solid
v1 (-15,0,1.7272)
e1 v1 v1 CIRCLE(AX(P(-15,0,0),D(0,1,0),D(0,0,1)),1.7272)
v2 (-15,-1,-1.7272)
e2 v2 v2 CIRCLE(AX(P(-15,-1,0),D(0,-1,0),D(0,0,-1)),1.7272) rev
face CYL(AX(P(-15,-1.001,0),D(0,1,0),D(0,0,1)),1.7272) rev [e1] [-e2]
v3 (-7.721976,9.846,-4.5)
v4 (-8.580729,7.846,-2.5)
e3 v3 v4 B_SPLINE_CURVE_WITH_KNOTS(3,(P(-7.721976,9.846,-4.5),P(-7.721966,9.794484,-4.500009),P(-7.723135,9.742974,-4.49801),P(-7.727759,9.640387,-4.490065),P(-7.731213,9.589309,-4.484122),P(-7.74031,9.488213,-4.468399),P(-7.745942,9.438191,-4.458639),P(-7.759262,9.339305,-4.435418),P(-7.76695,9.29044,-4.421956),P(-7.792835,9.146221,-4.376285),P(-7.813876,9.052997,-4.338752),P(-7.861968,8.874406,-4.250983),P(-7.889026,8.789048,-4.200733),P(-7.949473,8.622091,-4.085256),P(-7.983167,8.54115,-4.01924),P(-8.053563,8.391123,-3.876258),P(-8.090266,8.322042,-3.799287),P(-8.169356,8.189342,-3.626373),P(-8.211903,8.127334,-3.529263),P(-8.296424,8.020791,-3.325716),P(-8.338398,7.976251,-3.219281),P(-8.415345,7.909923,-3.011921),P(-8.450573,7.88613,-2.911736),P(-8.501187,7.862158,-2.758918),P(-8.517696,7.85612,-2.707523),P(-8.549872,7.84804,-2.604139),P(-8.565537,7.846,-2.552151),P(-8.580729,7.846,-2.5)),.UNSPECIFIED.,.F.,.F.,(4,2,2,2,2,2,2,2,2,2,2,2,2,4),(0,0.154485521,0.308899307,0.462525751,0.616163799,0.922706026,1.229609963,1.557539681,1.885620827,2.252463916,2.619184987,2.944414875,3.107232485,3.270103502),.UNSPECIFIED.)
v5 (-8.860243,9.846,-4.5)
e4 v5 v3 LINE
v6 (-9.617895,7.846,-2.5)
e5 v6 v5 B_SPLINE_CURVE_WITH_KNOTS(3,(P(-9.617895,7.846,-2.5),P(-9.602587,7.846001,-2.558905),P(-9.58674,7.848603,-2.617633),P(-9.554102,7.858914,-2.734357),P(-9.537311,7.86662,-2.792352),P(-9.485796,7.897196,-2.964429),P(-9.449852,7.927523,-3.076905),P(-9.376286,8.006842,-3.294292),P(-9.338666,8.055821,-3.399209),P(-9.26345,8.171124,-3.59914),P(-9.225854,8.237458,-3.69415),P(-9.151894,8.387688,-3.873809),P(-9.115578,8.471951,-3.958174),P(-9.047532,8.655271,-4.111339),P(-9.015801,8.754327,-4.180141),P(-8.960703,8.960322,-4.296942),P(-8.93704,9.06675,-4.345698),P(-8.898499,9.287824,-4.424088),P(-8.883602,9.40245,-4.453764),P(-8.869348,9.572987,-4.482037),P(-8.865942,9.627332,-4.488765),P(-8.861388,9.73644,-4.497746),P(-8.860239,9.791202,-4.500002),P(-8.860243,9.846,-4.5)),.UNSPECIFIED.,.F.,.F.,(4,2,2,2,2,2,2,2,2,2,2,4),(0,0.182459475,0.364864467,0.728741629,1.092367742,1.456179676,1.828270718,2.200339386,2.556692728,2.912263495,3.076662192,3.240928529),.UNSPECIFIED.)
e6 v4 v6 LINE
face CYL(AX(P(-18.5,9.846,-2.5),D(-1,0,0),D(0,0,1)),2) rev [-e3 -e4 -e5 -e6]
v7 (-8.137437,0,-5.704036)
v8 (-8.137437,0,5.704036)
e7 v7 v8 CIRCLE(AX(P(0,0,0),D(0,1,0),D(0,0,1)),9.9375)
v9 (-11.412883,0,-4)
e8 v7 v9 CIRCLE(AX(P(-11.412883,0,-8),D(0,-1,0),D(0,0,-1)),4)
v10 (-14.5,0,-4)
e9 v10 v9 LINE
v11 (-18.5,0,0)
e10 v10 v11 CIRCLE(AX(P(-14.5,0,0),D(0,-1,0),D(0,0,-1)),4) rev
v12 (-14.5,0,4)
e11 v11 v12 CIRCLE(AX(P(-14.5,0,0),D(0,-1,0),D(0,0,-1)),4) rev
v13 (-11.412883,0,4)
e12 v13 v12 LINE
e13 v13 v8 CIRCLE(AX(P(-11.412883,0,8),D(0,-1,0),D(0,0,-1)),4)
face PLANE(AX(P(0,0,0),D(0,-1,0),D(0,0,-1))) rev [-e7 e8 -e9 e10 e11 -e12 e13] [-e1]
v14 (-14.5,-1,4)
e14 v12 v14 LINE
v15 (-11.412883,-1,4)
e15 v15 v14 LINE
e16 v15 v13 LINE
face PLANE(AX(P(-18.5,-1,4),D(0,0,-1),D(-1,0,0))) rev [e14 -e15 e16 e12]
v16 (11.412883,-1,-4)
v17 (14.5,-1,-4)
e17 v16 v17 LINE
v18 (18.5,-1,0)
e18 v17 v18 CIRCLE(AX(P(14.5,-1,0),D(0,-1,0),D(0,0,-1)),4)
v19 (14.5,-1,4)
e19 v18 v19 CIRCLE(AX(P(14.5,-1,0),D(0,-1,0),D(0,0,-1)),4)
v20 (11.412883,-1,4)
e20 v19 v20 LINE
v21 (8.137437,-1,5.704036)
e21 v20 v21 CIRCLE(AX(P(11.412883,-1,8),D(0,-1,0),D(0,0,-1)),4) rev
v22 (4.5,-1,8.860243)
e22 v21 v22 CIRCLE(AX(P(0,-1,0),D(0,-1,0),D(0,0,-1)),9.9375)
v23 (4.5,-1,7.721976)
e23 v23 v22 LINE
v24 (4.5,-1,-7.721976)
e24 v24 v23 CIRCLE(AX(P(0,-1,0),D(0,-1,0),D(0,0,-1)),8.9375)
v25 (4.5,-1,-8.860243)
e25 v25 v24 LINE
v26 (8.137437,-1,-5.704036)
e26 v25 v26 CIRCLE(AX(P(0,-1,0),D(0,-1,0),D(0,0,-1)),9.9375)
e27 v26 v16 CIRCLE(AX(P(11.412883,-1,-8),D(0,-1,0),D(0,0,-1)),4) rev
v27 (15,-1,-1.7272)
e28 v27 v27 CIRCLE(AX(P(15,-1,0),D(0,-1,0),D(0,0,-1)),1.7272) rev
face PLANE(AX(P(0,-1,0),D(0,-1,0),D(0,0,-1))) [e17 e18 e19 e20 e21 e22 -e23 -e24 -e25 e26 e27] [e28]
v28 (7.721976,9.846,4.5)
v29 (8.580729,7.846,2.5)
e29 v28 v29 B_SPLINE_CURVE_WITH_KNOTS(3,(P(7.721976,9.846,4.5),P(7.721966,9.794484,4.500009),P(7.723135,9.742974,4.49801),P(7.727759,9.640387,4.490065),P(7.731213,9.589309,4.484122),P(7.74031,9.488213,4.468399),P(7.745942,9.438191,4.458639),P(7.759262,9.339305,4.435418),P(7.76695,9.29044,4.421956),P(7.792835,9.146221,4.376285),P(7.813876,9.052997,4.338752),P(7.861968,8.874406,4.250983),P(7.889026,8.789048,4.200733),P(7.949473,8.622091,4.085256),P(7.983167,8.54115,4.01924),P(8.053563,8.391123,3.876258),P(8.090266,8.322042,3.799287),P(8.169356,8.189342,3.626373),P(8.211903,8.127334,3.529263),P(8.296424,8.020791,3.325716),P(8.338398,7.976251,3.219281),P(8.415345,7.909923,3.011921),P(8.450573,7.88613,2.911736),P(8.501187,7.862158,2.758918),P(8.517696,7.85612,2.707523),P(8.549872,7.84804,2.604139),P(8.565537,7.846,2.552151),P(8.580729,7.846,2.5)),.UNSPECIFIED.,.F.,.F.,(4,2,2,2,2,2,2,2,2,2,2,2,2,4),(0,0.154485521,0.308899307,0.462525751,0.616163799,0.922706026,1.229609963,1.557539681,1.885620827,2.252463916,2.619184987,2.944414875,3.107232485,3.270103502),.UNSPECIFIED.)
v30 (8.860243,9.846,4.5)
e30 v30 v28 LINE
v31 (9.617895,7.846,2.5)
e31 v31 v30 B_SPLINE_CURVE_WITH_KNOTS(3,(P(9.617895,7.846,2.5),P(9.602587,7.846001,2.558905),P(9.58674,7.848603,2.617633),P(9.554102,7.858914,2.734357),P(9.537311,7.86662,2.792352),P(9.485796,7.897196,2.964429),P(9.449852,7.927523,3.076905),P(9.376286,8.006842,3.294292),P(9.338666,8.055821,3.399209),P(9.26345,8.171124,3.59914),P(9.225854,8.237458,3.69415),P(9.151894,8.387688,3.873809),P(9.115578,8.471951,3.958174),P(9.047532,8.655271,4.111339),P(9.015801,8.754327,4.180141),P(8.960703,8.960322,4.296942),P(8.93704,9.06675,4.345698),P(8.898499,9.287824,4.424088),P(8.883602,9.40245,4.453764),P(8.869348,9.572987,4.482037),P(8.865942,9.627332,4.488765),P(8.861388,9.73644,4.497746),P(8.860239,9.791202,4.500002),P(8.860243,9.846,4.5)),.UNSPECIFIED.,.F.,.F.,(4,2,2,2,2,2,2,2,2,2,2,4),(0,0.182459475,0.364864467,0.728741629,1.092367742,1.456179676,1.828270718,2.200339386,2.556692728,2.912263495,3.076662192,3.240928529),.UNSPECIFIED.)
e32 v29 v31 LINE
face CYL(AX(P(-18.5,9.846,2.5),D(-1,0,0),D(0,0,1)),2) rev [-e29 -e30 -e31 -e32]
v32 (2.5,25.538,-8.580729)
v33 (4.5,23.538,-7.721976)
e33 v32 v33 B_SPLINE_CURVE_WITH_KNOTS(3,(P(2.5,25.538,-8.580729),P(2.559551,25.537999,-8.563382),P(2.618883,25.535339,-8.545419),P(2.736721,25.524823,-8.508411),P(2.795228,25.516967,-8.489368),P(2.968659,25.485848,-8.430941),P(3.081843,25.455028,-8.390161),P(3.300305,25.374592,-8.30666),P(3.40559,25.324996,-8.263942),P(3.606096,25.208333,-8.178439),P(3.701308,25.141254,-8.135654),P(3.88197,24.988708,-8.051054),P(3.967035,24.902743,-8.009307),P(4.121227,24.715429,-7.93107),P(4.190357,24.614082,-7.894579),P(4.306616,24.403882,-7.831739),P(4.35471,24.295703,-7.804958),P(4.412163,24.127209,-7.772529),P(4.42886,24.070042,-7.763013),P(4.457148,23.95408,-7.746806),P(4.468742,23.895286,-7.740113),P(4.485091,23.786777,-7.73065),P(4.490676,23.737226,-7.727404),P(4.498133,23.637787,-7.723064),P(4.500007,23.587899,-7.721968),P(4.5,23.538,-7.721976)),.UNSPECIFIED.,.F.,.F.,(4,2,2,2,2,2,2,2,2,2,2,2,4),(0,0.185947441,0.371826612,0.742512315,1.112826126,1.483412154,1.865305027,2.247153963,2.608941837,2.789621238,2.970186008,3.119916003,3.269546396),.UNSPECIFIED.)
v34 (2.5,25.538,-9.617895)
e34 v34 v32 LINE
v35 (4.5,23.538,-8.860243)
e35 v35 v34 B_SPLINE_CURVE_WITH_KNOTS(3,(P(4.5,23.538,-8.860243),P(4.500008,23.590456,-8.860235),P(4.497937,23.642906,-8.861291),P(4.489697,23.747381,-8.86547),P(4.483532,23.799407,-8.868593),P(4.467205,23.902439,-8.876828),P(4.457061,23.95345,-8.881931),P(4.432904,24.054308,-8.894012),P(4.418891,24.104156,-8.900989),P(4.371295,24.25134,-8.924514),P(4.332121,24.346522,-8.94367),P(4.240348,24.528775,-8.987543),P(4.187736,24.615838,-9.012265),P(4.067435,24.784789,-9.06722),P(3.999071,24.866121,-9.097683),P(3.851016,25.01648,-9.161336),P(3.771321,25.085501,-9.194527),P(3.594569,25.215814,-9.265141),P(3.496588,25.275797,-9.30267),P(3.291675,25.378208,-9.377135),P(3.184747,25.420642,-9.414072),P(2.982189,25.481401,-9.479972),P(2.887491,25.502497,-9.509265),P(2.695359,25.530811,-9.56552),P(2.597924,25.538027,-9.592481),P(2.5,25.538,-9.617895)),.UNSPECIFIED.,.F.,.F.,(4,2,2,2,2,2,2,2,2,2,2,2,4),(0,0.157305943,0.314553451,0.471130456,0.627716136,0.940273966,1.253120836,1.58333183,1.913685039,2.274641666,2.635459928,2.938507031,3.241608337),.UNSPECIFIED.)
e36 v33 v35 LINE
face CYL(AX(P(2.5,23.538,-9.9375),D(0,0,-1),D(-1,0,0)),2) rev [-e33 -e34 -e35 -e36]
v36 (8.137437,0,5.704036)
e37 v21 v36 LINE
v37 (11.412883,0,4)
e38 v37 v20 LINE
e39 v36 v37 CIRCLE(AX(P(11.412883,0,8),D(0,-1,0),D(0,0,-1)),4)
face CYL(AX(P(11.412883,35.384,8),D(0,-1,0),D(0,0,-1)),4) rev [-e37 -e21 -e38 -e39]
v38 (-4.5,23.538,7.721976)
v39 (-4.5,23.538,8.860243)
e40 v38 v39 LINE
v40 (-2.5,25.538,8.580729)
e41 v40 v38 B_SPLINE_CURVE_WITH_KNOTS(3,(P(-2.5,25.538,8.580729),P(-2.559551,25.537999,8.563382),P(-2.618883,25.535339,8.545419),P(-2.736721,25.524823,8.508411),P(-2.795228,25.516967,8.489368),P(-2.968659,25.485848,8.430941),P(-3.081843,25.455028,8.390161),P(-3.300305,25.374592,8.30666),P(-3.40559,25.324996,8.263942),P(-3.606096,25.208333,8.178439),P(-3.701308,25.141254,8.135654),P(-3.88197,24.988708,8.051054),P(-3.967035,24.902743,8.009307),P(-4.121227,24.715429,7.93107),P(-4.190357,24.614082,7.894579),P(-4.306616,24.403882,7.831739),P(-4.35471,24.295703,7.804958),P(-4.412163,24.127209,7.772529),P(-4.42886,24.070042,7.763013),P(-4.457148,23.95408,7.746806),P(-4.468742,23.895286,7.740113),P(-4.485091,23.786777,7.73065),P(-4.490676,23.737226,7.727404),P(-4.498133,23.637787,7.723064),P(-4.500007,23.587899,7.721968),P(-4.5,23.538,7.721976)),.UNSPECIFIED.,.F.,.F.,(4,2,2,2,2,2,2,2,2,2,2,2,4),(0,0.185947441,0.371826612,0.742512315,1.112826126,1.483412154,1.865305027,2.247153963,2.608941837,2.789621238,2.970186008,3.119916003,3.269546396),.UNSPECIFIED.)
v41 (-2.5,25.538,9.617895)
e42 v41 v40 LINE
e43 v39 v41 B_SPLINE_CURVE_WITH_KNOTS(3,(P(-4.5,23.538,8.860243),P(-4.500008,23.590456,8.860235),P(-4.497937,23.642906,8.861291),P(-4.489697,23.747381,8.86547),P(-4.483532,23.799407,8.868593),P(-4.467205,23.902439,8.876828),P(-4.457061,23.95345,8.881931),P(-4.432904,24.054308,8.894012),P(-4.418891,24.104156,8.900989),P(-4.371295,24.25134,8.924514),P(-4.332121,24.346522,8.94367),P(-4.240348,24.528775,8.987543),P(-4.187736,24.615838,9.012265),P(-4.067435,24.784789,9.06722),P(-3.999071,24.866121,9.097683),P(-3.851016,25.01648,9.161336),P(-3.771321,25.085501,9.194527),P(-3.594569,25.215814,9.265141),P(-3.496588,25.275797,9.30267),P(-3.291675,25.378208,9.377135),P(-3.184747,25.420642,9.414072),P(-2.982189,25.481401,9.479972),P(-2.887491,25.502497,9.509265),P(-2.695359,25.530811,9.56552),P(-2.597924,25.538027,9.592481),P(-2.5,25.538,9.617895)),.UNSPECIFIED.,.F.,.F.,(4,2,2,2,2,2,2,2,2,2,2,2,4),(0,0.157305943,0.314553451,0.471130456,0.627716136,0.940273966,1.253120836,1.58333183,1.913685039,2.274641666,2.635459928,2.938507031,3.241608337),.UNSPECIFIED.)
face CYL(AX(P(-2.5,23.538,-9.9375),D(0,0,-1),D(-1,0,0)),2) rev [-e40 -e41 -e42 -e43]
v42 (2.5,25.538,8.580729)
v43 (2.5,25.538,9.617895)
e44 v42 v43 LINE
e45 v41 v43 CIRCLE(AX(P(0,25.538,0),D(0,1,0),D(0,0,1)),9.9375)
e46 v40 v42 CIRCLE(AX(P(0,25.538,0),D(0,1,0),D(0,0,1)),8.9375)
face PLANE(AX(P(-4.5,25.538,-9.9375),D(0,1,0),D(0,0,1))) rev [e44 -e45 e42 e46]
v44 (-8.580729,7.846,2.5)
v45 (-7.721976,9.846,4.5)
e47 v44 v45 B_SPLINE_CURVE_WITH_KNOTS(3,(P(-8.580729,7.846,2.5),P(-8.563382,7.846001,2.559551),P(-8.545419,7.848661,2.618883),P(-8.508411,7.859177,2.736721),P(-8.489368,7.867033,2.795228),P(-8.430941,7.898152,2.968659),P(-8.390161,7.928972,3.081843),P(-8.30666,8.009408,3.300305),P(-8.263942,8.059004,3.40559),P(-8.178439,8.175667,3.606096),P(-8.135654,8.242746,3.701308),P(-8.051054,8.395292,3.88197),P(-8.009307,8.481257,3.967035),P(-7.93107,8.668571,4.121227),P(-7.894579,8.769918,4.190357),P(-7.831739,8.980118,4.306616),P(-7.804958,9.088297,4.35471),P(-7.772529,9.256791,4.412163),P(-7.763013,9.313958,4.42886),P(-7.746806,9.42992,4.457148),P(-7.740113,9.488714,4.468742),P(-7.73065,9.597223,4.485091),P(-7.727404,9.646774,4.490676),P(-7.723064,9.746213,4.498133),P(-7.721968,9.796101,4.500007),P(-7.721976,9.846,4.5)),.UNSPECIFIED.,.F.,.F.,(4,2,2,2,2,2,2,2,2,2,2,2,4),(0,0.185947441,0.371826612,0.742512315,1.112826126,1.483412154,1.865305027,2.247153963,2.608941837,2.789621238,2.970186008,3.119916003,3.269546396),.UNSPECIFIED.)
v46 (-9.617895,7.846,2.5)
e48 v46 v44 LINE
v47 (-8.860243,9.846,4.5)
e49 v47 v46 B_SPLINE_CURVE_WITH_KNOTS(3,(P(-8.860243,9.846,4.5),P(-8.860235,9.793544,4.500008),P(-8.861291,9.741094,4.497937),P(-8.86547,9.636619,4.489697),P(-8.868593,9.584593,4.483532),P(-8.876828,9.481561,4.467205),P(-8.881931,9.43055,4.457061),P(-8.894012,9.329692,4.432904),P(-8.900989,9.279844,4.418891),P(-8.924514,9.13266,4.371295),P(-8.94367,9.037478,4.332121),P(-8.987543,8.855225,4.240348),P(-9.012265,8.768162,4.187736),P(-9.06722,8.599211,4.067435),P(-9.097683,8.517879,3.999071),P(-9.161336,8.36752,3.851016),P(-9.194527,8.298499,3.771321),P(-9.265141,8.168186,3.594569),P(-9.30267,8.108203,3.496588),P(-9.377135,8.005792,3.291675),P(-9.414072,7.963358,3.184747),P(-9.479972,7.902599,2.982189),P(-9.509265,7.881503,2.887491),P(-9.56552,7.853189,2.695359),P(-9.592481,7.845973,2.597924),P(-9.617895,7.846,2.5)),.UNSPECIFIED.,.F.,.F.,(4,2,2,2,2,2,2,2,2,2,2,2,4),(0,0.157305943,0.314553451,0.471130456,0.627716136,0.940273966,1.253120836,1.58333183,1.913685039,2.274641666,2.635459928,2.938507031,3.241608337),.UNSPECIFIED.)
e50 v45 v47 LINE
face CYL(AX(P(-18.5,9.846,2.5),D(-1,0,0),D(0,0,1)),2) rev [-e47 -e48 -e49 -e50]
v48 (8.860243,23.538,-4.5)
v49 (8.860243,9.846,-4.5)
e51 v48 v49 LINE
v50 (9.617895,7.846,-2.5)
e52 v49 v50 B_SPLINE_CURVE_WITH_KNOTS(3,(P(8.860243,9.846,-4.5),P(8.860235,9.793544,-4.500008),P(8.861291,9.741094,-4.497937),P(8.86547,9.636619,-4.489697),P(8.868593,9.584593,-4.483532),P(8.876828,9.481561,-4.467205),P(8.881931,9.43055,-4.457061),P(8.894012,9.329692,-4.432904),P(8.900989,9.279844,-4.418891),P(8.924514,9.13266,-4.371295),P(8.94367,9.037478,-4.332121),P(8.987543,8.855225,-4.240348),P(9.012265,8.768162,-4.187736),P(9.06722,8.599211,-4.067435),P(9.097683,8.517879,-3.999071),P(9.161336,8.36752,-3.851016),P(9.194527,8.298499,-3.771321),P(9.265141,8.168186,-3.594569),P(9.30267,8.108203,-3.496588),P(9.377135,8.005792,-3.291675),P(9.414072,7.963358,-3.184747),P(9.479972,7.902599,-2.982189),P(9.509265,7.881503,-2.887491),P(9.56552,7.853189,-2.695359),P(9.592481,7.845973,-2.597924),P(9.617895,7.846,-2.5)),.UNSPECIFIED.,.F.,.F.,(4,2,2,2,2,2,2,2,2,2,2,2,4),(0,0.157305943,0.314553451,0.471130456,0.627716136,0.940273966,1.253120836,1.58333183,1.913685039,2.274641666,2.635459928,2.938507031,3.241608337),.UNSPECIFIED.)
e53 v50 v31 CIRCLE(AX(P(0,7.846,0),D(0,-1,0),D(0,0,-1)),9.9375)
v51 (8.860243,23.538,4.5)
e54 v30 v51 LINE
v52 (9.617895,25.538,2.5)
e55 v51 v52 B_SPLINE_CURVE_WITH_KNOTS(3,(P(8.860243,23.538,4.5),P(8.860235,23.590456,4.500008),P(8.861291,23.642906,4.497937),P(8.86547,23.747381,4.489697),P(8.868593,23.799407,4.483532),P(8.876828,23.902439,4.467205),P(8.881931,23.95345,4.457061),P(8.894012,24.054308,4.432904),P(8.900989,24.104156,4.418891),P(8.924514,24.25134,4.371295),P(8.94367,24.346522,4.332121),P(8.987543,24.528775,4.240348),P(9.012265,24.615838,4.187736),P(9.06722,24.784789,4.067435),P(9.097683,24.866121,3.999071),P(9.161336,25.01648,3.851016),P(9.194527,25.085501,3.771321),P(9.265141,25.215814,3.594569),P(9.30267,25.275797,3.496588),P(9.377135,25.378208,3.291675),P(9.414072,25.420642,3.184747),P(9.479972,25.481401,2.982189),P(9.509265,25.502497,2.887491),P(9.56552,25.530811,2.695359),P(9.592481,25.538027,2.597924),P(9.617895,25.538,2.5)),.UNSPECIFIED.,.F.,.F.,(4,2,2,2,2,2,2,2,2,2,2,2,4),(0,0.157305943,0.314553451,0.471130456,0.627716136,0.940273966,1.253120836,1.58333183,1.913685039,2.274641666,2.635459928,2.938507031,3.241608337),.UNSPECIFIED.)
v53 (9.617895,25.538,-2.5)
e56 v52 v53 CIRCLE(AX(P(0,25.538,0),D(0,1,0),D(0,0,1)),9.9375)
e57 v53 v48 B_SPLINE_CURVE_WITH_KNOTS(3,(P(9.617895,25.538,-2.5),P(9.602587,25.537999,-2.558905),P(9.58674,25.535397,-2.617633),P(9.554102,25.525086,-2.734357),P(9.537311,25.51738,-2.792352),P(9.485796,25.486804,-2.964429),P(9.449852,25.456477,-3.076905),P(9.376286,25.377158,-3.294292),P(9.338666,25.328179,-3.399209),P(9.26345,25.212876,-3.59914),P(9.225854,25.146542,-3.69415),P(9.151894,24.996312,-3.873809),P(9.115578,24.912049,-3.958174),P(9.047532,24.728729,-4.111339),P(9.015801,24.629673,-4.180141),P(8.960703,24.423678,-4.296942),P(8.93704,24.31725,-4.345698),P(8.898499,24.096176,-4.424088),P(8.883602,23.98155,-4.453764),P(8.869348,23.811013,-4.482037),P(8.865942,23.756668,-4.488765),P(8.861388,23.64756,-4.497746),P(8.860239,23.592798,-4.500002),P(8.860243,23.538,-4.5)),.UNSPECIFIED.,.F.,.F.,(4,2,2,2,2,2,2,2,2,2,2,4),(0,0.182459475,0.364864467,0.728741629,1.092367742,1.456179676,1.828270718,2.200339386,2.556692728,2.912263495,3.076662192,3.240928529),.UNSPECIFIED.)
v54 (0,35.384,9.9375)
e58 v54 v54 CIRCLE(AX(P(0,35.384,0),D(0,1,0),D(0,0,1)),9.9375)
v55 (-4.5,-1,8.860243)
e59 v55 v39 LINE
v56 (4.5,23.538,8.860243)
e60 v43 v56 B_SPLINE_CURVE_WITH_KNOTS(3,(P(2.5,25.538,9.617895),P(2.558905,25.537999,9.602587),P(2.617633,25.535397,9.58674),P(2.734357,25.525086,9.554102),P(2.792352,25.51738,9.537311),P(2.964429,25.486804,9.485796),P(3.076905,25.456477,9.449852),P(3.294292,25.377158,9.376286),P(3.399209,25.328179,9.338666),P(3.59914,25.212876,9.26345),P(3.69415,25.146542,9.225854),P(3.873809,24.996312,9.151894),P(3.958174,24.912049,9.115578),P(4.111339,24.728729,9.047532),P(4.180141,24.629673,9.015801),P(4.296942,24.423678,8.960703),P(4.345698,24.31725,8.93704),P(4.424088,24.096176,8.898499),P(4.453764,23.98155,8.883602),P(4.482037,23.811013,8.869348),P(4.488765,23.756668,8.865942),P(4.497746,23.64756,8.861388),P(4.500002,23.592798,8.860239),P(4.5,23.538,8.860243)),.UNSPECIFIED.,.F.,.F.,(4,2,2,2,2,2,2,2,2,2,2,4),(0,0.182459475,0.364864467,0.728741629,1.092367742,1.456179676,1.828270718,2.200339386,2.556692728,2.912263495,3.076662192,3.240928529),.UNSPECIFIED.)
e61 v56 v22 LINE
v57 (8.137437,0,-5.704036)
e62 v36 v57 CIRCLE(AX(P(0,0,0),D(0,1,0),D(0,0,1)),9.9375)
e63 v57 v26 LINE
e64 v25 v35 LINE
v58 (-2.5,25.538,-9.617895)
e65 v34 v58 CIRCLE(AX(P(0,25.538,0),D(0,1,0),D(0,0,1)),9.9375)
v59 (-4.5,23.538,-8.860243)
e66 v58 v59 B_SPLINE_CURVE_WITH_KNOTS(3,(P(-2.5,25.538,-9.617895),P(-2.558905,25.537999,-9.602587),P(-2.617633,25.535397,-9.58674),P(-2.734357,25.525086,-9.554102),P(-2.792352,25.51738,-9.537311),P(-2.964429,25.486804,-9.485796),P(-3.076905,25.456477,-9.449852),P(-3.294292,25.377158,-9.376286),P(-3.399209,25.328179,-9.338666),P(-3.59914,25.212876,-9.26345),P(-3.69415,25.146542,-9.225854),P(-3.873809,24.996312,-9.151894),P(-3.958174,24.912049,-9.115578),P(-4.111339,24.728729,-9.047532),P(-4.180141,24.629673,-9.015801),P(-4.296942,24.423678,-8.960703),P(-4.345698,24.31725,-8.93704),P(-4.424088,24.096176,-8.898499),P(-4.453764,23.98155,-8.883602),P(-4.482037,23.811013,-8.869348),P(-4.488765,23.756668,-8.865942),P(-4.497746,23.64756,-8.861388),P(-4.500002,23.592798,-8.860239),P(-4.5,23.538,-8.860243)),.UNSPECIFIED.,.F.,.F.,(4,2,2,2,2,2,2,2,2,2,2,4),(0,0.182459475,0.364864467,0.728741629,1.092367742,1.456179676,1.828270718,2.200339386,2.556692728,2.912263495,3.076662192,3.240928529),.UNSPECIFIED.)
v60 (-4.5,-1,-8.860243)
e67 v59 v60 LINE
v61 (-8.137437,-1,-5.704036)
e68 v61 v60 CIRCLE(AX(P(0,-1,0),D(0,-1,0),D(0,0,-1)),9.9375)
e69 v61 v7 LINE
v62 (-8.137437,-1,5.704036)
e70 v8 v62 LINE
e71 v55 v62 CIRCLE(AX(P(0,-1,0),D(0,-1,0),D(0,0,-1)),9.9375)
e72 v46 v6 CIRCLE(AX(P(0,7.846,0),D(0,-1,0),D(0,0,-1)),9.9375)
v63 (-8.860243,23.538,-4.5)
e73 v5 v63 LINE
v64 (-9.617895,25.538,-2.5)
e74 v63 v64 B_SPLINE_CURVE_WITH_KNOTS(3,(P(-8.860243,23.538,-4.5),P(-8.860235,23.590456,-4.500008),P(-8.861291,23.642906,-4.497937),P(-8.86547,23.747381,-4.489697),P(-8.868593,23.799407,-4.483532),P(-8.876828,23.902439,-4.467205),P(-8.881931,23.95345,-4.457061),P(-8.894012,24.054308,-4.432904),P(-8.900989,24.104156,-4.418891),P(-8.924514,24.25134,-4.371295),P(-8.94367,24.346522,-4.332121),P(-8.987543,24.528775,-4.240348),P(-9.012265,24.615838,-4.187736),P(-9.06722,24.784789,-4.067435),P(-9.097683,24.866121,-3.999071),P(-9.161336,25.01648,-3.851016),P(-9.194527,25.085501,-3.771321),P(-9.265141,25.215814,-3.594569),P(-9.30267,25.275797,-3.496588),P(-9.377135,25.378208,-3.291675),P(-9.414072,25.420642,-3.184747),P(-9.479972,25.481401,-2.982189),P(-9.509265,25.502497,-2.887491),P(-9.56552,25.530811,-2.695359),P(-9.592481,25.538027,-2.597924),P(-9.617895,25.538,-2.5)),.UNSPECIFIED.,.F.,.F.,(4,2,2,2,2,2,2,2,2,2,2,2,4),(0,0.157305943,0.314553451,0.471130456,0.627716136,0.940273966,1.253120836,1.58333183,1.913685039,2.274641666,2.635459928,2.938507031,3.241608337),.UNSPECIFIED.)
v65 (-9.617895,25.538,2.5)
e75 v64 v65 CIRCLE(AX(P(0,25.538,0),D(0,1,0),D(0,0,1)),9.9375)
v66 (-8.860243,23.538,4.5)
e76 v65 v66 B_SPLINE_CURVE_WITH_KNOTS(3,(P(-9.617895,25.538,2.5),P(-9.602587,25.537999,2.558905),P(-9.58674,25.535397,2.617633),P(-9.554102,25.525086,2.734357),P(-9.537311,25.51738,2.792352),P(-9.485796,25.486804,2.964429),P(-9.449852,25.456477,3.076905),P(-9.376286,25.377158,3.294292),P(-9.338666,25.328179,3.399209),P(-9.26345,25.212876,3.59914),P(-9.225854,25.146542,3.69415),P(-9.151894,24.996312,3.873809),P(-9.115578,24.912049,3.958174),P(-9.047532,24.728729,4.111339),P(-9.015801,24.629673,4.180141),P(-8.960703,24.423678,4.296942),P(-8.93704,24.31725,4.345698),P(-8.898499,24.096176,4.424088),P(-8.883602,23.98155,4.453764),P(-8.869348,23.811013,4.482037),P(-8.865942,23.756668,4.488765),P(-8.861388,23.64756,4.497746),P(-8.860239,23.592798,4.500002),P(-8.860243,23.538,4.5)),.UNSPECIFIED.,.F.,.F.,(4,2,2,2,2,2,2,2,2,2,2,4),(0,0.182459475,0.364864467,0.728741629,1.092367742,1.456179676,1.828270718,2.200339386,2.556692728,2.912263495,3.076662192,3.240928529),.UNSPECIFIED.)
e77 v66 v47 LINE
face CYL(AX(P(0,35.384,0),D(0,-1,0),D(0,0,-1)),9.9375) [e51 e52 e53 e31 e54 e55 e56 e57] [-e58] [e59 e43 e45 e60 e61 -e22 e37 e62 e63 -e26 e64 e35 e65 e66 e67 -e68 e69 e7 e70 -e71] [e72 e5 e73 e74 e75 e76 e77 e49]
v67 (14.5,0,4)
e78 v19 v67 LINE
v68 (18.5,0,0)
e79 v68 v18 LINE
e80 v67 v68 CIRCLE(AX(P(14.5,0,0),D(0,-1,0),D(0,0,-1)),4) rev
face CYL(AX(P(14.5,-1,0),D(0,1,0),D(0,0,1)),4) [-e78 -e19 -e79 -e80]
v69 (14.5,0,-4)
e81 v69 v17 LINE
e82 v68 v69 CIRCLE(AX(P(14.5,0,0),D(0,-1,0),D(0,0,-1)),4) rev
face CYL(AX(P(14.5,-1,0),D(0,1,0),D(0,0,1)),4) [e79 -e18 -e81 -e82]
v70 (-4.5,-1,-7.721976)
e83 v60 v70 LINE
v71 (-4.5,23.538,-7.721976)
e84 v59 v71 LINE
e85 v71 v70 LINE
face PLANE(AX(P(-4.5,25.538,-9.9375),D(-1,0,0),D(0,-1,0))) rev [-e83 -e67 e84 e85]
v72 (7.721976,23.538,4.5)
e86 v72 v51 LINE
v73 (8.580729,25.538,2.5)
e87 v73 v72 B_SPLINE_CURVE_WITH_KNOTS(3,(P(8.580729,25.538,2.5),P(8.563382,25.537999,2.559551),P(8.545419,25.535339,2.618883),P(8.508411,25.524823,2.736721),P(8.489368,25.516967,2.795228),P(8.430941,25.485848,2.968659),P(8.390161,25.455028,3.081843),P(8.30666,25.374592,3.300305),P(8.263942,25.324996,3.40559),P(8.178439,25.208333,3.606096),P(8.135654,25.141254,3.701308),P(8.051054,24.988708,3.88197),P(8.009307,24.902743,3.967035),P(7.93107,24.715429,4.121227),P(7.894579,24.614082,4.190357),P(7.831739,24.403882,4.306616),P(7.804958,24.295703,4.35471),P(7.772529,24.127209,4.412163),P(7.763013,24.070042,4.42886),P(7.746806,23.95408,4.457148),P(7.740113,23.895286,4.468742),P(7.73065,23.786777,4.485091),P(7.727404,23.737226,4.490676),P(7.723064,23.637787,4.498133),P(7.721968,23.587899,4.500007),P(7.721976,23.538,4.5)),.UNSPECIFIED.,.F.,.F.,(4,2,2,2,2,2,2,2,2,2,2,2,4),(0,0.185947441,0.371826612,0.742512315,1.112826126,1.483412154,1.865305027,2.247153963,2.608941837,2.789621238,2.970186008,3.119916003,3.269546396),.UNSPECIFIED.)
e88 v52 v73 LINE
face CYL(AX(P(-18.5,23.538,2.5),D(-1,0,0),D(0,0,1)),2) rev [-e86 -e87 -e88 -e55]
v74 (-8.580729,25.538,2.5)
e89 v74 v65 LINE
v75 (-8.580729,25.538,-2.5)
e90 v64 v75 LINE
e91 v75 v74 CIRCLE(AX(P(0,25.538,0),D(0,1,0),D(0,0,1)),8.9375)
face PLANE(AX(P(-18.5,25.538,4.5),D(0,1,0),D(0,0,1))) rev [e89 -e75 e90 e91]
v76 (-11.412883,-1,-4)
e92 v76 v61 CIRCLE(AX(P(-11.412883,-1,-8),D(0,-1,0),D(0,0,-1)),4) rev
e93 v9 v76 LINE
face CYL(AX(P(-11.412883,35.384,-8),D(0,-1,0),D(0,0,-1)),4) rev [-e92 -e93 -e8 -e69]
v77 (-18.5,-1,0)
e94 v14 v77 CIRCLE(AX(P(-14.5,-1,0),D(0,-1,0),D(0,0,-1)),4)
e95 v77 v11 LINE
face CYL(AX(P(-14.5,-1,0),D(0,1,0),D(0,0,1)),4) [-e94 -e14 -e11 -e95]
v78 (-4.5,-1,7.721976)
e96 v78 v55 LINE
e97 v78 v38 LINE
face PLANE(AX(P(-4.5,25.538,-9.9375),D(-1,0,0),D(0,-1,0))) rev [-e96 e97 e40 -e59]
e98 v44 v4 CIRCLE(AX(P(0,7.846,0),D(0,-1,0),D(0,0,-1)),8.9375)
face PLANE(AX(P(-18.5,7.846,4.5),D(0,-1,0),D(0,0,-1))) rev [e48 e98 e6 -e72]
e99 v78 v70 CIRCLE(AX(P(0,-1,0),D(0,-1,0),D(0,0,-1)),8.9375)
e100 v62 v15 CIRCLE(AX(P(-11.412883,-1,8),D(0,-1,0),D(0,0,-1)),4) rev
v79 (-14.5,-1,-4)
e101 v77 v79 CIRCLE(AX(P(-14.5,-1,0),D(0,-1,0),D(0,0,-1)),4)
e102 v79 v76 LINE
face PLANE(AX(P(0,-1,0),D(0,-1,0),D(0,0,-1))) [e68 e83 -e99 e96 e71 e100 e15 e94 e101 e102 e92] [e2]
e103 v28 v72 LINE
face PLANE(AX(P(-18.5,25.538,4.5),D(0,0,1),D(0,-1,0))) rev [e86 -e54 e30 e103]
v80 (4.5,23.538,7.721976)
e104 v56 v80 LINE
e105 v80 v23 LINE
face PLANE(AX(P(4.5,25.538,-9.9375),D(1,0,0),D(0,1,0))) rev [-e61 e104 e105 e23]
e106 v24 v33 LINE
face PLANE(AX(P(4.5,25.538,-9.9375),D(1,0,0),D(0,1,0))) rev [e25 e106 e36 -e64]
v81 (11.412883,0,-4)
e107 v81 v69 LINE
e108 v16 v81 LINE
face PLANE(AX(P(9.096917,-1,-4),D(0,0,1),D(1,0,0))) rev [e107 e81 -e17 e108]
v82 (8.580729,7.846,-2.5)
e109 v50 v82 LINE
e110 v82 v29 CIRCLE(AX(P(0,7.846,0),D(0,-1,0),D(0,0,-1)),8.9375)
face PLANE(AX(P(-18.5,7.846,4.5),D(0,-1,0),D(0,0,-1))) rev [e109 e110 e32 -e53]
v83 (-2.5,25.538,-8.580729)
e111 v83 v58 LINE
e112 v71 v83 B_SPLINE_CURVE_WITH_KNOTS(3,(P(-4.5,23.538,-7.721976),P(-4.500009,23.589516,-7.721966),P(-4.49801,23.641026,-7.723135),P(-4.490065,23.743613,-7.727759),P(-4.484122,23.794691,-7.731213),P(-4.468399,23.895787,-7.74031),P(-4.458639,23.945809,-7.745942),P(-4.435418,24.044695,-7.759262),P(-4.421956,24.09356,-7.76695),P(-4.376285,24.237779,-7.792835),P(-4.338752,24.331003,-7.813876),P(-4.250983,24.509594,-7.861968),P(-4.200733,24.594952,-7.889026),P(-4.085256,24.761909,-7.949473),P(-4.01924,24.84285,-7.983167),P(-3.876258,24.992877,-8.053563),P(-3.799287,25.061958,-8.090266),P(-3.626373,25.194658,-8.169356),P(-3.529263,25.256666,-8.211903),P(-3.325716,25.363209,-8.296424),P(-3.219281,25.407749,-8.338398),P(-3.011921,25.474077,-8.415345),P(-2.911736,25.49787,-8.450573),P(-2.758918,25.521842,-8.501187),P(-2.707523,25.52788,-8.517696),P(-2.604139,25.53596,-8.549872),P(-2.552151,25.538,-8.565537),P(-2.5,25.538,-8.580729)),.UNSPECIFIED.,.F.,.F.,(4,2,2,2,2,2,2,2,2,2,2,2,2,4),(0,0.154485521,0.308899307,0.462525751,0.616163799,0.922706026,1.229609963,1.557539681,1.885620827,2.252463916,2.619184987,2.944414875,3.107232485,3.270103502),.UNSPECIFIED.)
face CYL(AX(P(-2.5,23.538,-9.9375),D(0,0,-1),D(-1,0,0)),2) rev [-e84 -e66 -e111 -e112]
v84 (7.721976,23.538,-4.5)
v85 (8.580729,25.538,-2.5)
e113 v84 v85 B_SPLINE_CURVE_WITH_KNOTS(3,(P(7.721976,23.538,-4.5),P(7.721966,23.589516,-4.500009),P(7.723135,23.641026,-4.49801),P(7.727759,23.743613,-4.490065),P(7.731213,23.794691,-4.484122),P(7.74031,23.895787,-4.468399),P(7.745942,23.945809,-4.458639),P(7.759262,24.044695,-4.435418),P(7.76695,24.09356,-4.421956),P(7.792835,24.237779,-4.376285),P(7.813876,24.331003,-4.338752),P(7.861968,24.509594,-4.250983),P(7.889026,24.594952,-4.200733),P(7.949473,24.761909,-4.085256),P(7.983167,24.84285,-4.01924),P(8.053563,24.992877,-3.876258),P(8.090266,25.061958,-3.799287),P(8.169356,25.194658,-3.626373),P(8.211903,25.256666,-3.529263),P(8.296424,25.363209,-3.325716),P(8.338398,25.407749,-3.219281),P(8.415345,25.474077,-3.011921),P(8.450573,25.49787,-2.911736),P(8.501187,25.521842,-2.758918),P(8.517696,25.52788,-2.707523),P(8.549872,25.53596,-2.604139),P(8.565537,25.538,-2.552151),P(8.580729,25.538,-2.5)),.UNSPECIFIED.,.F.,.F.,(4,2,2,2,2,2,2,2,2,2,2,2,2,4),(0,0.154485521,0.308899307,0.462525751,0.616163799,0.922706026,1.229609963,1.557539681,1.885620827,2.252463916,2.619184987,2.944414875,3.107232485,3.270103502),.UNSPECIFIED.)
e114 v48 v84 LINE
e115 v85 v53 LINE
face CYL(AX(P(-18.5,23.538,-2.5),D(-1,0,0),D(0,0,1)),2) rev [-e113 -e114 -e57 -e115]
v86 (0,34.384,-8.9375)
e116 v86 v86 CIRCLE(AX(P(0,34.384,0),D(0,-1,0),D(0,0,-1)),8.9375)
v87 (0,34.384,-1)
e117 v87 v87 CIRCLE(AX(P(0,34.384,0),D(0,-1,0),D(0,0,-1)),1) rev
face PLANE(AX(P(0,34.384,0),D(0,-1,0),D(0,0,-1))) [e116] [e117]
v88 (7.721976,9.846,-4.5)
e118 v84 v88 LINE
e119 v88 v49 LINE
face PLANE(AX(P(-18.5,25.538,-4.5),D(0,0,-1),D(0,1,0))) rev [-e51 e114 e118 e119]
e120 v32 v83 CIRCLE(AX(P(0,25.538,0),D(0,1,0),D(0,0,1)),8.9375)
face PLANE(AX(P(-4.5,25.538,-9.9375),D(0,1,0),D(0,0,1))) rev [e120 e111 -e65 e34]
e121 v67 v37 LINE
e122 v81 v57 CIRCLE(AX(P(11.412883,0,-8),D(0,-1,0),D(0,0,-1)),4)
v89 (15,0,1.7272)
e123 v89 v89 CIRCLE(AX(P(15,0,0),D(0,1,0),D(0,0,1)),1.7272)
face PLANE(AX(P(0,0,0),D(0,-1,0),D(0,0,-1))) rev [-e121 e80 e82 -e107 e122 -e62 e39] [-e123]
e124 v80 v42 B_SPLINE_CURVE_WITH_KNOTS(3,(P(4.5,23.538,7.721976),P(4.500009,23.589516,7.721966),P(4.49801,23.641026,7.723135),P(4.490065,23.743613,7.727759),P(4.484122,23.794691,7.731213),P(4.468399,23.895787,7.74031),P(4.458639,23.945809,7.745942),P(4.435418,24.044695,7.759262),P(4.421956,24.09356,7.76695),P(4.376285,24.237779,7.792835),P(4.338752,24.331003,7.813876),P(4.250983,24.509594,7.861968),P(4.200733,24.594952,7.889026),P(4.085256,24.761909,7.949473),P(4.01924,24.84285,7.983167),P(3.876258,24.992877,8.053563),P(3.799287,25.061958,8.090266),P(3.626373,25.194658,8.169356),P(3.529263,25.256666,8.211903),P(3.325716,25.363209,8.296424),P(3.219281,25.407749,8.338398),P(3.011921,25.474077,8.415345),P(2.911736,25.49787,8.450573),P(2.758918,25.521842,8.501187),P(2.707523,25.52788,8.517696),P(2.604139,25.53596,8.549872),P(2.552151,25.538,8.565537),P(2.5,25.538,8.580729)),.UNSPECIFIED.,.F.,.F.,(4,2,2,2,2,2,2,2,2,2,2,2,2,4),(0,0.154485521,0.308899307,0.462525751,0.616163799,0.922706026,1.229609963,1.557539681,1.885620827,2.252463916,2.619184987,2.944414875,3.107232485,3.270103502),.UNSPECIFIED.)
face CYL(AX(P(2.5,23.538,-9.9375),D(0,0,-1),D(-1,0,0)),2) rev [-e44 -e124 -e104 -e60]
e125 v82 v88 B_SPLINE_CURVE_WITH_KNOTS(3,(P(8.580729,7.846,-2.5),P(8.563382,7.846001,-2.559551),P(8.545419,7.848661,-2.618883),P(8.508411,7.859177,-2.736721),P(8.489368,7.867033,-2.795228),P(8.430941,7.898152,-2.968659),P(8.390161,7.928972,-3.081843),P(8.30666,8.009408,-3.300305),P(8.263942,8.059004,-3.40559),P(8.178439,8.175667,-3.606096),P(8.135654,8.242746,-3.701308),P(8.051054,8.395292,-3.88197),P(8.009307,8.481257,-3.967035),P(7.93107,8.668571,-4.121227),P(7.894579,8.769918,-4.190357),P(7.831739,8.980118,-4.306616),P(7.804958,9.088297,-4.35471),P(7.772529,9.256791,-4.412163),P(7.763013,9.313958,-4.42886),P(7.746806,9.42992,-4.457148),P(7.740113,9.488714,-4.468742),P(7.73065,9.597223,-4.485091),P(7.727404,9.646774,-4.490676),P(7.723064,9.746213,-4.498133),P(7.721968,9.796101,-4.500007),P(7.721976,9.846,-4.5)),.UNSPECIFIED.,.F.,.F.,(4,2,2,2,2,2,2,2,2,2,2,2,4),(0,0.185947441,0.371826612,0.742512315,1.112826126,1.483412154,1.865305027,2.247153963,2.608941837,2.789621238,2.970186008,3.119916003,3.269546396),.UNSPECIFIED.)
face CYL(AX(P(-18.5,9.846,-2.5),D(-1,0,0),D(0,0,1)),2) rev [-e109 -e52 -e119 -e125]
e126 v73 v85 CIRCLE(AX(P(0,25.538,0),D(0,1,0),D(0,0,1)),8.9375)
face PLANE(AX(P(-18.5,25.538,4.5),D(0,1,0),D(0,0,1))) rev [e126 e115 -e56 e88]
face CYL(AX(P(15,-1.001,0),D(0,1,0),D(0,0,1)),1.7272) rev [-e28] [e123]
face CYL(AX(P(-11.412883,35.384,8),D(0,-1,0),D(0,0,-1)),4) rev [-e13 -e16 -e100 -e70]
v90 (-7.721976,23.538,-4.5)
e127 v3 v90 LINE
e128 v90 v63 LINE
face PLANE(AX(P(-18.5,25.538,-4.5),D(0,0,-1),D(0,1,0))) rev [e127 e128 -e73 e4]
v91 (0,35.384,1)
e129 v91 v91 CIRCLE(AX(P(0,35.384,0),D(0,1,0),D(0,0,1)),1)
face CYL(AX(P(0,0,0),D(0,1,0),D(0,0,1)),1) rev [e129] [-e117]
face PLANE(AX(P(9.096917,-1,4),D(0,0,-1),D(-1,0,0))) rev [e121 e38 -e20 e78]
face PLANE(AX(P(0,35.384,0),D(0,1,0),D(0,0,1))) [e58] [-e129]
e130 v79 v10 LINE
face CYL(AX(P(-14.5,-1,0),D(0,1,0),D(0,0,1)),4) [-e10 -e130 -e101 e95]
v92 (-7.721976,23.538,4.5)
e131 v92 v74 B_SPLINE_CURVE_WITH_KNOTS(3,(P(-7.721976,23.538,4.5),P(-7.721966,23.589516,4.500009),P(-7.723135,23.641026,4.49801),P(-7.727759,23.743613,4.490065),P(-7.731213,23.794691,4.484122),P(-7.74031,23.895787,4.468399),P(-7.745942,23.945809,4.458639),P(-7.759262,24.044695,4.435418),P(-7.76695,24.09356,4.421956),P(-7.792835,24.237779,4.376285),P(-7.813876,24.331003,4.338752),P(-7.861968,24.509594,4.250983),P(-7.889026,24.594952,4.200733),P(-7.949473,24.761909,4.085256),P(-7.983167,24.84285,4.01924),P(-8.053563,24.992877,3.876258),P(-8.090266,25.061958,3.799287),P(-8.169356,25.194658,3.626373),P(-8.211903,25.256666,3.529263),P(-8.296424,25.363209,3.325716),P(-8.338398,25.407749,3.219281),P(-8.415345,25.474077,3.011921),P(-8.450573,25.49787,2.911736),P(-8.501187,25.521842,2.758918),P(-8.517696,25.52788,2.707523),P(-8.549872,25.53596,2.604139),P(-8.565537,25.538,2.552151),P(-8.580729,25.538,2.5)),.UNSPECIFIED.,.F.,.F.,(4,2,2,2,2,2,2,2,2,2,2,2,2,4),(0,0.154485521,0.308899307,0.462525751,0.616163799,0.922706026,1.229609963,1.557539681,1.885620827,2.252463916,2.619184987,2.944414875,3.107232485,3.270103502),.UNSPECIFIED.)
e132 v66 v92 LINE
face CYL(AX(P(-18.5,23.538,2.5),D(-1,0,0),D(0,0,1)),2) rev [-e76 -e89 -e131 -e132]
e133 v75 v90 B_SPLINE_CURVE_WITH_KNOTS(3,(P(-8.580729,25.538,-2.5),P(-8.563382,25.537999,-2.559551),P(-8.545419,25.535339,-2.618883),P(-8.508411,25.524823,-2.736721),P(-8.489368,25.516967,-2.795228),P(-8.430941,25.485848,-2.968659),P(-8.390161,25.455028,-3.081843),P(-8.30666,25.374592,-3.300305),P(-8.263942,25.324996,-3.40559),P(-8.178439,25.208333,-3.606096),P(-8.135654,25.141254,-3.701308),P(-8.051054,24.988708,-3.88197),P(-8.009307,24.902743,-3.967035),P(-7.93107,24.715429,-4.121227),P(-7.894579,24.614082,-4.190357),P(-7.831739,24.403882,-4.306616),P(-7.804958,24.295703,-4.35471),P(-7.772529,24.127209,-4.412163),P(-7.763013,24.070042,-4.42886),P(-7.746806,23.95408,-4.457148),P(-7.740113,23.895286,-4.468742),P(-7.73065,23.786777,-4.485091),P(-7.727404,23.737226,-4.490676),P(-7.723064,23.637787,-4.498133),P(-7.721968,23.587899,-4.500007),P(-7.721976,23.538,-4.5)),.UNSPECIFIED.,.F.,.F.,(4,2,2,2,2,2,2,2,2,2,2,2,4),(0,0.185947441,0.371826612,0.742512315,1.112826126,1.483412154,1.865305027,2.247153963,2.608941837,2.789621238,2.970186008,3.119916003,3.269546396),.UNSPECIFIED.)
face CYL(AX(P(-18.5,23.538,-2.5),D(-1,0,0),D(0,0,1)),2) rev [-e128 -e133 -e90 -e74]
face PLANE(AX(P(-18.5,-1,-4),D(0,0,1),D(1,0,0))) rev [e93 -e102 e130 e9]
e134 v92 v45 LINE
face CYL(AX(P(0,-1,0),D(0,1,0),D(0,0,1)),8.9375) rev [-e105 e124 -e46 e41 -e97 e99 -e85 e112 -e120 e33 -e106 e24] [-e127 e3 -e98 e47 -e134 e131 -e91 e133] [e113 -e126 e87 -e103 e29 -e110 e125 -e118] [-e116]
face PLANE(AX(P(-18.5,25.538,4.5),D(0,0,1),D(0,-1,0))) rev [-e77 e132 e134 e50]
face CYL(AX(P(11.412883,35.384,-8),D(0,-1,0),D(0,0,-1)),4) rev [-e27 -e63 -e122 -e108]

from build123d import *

# Parameters (mm, degrees)
SKETCH2_R           = 9.9375
BOSS_EXTRUDE1_DEPTH = 35.384
SKETCH4_R           = 1
CUT_EXTRUDE2_DEPTH  = 39.072762817
BOSS_EXTRUDE2_START = 1
SKETCH11_R          = 8.9375
BOSS_EXTRUDE2_DEPTH = 1
SKETCH12_R          = 8.9375
CUT_EXTRUDE7_DEPTH  = 34.384
CUT_EXTRUDE8_START  = -1
CUT_EXTRUDE8_DEPTH  = 26.538
SKETCH14_W          = 9
SKETCH14_H          = 17.692
CUT_EXTRUDE9_DEPTH  = 61.852537846
FILLET3_R           = 2
FILLET4_R           = 4
CUT_EXTRUDE10_REACH = 43.146
SKETCH15_R          = 1.7272


# Read off the part's stored shape, not the designer's step: Cut-Extrude8
with BuildPart() as part:
    # Sketch2 → Boss-Extrude1 (new body)
    with BuildSketch(Plane(origin=(0, 0, 0), x_dir=(1, 0, 0), z_dir=(0, 1, 0))):
        with Locations(Location((0, 0, 0), (0, 0, 270))):
            Circle(SKETCH2_R)
    extrude(amount=BOSS_EXTRUDE1_DEPTH)

    # Sketch4 → Cut-Extrude2 (cut, through all)
    with BuildSketch(Plane(origin=(0, 35.384, 0), x_dir=(1, 0, 0), z_dir=(0, 1, 0))):
        with Locations(Location((0, 0, 0), (0, 0, 270))):
            Circle(SKETCH4_R)
    extrude(amount=-CUT_EXTRUDE2_DEPTH, mode=Mode.SUBTRACT)

    # Sketch11 → Boss-Extrude2 (add)
    with BuildSketch(Plane.XZ.offset(BOSS_EXTRUDE2_START)):
        with BuildLine():
            Line((9.096917404, 4), (18.5, 4))
            Line((18.5, 4), (18.5, -4))
            Line((18.5, -4), (9.096917404, -4))
            ThreePointArc((9.096917404, -4), (0, -9.9375), (-9.096917404, -4))
            Line((-9.096917404, -4), (-18.5, -4))
            Line((-18.5, -4), (-18.5, 4))
            Line((-18.5, 4), (-9.096917404, 4))
            ThreePointArc((-9.096917404, 4), (0, 9.9375), (9.096917404, 4))
        make_face()
        with Locations(Location((0, 0, 0), (0, 0, 270))):
            Circle(SKETCH11_R, mode=Mode.SUBTRACT)
    extrude(amount=-BOSS_EXTRUDE2_DEPTH)

    # Sketch12 → Cut-Extrude7 (cut)
    with BuildSketch(Plane.XZ):
        with Locations(Location((0, 0, 0), (0, 0, 270))):
            Circle(SKETCH12_R)
    extrude(amount=-CUT_EXTRUDE7_DEPTH, mode=Mode.SUBTRACT)

    # Cut-Extrude8 outline → Cut-Extrude8 (cut)
    with BuildSketch(Plane(origin=(0, 0, 0), x_dir=(1, 0, 0), z_dir=(0, 1, 0)).offset(CUT_EXTRUDE8_START)):
        with BuildLine():
            ThreePointArc((4.5, -7.721975541), (0, -8.9375), (-4.5, -7.721975541))
            Line((-4.5, -7.721975541), (-4.5, -8.860243013))
            ThreePointArc((-4.5, -8.860243013), (0, -9.9375), (4.5, -8.860243013))
            Line((4.5, -8.860243013), (4.5, -7.721975541))
        make_face()
        with BuildLine():
            Line((-4.5, 8.860243013), (-4.5, 7.721975541))
            ThreePointArc((-4.5, 7.721975541), (0, 8.9375), (4.5, 7.721975541))
            Line((4.5, 7.721975541), (4.5, 8.860243013))
            ThreePointArc((4.5, 8.860243013), (0, 9.9375), (-4.5, 8.860243013))
        make_face()
    extrude(amount=CUT_EXTRUDE8_DEPTH, mode=Mode.SUBTRACT)

    # Sketch14 → Cut-Extrude9 (cut, through all)
    with BuildSketch(Plane(origin=(30, 0, 0), x_dir=(0, 0, -1), z_dir=(1, 0, 0))):
        with Locations((0, 16.692)):
            Rectangle(SKETCH14_W, SKETCH14_H)
    extrude(amount=-CUT_EXTRUDE9_DEPTH, mode=Mode.SUBTRACT)

    # Fillet3
    fillet3_edges = [part.edges().sort_by_distance(p)[0] for p in [
        (4.5, 25.538, 8.291109277),
        (4.5, 25.538, -8.291109277),
        (-4.5, 25.538, -8.291109277),
        (-4.5, 25.538, 8.291109277),
        (8.291109277, 25.538, -4.5),
        (-8.291109277, 25.538, -4.5),
        (8.291109277, 7.846, -4.5),
        (-8.291109277, 7.846, -4.5),
        (-8.291109277, 7.846, 4.5),
        (8.291109277, 7.846, 4.5),
        (8.291109277, 25.538, 4.5),
        (-8.291109277, 25.538, 4.5),
    ]]
    fillet(fillet3_edges, radius=FILLET3_R)

    # Fillet4
    # the kernel refuses this fillet: 4 mm, written as the material it adds along each edge
    with BuildSketch(Plane(origin=(9.096917404, -1, -4), x_dir=(-0.4906341894667762, 0, -0.8713656477772574), z_dir=(0, 1, 0)), Plane(origin=(-9.096917404, -1, 4), x_dir=(0.49063418946677706, 0, 0.871365647777257), z_dir=(0, 1, 0))) as fillet4_piece_1:
        with BuildLine():
            CenterArc((2.349170519, -3.980589921), FILLET4_R, 95.646730554, 54.970995912)
            Line((-1.136292073, -2.018053163), (0, 0))
            ThreePointArc((0, 0), (0.977796106, -0.048221916), (1.955592212, 0))
        make_face()
    extrude(amount=1)
    with BuildSketch(Plane(origin=(9.096917404, -1, 4), x_dir=(-0.4906341894667768, 0, 0.8713656477772572), z_dir=(0, 1, 0)), Plane(origin=(-9.096917404, -1, -4), x_dir=(0.4906341894667772, 0, -0.8713656477772569), z_dir=(0, 1, 0))) as fillet4_piece_2:
        with BuildLine():
            CenterArc((2.349170519, 3.980589921), FILLET4_R, 209.382273534, 54.970995912)
            Line((-1.136292073, 2.018053163), (0, 0))
            ThreePointArc((0, 0), (0.977796106, 0.048221916), (1.955592212, 0))
        make_face()
    extrude(amount=1)
    # the kernel refuses this fillet: 4 mm, written as the material it takes off along each edge
    with BuildSketch(Plane(origin=(18.5, -11, -4), x_dir=(0, 0, 1), z_dir=(0, 1, 0)), Plane(origin=(18.5, -11, 4), x_dir=(-1, 0, 0), z_dir=(0, 1, 0))) as fillet4_2_piece_1:
        with BuildLine():
            CenterArc((FILLET4_R, -FILLET4_R), FILLET4_R, 90, 90)
            Line((0, -FILLET4_R), (0, 0))
            Line((0, 0), (FILLET4_R, 0))
        make_face()
    extrude(amount=21, mode=Mode.SUBTRACT)
    with BuildSketch(Plane(origin=(-18.5, -11, -4), x_dir=(0, 0, 1), z_dir=(0, 1, 0)), Plane(origin=(-18.5, -11, 4), x_dir=(1, 0, 0), z_dir=(0, 1, 0))) as fillet4_2_piece_2:
        with BuildLine():
            CenterArc((FILLET4_R, FILLET4_R), FILLET4_R, 180, 90)
            Line((0, FILLET4_R), (0, 0))
            Line((0, 0), (FILLET4_R, 0))
        make_face()
    extrude(amount=21, mode=Mode.SUBTRACT)

    # Sketch15 → Cut-Extrude10 (cut, up to next)
    with BuildSketch(Plane(origin=(0, 0, 0), x_dir=(1, 0, 0), z_dir=(0, 1, 0)), mode=Mode.PRIVATE) as cut_extrude10_sk1:
        with Locations(Location((-15, 0, 0), (0, 0, 270))):
            Circle(SKETCH15_R)
    cut_extrude10_tool1 = extrude(cut_extrude10_sk1.sketch, amount=-CUT_EXTRUDE10_REACH, mode=Mode.PRIVATE) & part.part
    # Sketch15 → Cut-Extrude10 (cut, up to next)
    with BuildSketch(Plane(origin=(0, 0, 0), x_dir=(1, 0, 0), z_dir=(0, 1, 0)), mode=Mode.PRIVATE) as cut_extrude10_sk2:
        with Locations(Location((15, 0, 0), (0, 0, 270))):
            Circle(SKETCH15_R)
    cut_extrude10_tool2 = extrude(cut_extrude10_sk2.sketch, amount=-CUT_EXTRUDE10_REACH, mode=Mode.PRIVATE) & part.part
    add(cut_extrude10_tool1.solids().sort_by_distance((-15, 0, 0))[0], mode=Mode.SUBTRACT)
    add(cut_extrude10_tool2.solids().sort_by_distance((15, 0, 0))[0], mode=Mode.SUBTRACT)


solid = part.part
